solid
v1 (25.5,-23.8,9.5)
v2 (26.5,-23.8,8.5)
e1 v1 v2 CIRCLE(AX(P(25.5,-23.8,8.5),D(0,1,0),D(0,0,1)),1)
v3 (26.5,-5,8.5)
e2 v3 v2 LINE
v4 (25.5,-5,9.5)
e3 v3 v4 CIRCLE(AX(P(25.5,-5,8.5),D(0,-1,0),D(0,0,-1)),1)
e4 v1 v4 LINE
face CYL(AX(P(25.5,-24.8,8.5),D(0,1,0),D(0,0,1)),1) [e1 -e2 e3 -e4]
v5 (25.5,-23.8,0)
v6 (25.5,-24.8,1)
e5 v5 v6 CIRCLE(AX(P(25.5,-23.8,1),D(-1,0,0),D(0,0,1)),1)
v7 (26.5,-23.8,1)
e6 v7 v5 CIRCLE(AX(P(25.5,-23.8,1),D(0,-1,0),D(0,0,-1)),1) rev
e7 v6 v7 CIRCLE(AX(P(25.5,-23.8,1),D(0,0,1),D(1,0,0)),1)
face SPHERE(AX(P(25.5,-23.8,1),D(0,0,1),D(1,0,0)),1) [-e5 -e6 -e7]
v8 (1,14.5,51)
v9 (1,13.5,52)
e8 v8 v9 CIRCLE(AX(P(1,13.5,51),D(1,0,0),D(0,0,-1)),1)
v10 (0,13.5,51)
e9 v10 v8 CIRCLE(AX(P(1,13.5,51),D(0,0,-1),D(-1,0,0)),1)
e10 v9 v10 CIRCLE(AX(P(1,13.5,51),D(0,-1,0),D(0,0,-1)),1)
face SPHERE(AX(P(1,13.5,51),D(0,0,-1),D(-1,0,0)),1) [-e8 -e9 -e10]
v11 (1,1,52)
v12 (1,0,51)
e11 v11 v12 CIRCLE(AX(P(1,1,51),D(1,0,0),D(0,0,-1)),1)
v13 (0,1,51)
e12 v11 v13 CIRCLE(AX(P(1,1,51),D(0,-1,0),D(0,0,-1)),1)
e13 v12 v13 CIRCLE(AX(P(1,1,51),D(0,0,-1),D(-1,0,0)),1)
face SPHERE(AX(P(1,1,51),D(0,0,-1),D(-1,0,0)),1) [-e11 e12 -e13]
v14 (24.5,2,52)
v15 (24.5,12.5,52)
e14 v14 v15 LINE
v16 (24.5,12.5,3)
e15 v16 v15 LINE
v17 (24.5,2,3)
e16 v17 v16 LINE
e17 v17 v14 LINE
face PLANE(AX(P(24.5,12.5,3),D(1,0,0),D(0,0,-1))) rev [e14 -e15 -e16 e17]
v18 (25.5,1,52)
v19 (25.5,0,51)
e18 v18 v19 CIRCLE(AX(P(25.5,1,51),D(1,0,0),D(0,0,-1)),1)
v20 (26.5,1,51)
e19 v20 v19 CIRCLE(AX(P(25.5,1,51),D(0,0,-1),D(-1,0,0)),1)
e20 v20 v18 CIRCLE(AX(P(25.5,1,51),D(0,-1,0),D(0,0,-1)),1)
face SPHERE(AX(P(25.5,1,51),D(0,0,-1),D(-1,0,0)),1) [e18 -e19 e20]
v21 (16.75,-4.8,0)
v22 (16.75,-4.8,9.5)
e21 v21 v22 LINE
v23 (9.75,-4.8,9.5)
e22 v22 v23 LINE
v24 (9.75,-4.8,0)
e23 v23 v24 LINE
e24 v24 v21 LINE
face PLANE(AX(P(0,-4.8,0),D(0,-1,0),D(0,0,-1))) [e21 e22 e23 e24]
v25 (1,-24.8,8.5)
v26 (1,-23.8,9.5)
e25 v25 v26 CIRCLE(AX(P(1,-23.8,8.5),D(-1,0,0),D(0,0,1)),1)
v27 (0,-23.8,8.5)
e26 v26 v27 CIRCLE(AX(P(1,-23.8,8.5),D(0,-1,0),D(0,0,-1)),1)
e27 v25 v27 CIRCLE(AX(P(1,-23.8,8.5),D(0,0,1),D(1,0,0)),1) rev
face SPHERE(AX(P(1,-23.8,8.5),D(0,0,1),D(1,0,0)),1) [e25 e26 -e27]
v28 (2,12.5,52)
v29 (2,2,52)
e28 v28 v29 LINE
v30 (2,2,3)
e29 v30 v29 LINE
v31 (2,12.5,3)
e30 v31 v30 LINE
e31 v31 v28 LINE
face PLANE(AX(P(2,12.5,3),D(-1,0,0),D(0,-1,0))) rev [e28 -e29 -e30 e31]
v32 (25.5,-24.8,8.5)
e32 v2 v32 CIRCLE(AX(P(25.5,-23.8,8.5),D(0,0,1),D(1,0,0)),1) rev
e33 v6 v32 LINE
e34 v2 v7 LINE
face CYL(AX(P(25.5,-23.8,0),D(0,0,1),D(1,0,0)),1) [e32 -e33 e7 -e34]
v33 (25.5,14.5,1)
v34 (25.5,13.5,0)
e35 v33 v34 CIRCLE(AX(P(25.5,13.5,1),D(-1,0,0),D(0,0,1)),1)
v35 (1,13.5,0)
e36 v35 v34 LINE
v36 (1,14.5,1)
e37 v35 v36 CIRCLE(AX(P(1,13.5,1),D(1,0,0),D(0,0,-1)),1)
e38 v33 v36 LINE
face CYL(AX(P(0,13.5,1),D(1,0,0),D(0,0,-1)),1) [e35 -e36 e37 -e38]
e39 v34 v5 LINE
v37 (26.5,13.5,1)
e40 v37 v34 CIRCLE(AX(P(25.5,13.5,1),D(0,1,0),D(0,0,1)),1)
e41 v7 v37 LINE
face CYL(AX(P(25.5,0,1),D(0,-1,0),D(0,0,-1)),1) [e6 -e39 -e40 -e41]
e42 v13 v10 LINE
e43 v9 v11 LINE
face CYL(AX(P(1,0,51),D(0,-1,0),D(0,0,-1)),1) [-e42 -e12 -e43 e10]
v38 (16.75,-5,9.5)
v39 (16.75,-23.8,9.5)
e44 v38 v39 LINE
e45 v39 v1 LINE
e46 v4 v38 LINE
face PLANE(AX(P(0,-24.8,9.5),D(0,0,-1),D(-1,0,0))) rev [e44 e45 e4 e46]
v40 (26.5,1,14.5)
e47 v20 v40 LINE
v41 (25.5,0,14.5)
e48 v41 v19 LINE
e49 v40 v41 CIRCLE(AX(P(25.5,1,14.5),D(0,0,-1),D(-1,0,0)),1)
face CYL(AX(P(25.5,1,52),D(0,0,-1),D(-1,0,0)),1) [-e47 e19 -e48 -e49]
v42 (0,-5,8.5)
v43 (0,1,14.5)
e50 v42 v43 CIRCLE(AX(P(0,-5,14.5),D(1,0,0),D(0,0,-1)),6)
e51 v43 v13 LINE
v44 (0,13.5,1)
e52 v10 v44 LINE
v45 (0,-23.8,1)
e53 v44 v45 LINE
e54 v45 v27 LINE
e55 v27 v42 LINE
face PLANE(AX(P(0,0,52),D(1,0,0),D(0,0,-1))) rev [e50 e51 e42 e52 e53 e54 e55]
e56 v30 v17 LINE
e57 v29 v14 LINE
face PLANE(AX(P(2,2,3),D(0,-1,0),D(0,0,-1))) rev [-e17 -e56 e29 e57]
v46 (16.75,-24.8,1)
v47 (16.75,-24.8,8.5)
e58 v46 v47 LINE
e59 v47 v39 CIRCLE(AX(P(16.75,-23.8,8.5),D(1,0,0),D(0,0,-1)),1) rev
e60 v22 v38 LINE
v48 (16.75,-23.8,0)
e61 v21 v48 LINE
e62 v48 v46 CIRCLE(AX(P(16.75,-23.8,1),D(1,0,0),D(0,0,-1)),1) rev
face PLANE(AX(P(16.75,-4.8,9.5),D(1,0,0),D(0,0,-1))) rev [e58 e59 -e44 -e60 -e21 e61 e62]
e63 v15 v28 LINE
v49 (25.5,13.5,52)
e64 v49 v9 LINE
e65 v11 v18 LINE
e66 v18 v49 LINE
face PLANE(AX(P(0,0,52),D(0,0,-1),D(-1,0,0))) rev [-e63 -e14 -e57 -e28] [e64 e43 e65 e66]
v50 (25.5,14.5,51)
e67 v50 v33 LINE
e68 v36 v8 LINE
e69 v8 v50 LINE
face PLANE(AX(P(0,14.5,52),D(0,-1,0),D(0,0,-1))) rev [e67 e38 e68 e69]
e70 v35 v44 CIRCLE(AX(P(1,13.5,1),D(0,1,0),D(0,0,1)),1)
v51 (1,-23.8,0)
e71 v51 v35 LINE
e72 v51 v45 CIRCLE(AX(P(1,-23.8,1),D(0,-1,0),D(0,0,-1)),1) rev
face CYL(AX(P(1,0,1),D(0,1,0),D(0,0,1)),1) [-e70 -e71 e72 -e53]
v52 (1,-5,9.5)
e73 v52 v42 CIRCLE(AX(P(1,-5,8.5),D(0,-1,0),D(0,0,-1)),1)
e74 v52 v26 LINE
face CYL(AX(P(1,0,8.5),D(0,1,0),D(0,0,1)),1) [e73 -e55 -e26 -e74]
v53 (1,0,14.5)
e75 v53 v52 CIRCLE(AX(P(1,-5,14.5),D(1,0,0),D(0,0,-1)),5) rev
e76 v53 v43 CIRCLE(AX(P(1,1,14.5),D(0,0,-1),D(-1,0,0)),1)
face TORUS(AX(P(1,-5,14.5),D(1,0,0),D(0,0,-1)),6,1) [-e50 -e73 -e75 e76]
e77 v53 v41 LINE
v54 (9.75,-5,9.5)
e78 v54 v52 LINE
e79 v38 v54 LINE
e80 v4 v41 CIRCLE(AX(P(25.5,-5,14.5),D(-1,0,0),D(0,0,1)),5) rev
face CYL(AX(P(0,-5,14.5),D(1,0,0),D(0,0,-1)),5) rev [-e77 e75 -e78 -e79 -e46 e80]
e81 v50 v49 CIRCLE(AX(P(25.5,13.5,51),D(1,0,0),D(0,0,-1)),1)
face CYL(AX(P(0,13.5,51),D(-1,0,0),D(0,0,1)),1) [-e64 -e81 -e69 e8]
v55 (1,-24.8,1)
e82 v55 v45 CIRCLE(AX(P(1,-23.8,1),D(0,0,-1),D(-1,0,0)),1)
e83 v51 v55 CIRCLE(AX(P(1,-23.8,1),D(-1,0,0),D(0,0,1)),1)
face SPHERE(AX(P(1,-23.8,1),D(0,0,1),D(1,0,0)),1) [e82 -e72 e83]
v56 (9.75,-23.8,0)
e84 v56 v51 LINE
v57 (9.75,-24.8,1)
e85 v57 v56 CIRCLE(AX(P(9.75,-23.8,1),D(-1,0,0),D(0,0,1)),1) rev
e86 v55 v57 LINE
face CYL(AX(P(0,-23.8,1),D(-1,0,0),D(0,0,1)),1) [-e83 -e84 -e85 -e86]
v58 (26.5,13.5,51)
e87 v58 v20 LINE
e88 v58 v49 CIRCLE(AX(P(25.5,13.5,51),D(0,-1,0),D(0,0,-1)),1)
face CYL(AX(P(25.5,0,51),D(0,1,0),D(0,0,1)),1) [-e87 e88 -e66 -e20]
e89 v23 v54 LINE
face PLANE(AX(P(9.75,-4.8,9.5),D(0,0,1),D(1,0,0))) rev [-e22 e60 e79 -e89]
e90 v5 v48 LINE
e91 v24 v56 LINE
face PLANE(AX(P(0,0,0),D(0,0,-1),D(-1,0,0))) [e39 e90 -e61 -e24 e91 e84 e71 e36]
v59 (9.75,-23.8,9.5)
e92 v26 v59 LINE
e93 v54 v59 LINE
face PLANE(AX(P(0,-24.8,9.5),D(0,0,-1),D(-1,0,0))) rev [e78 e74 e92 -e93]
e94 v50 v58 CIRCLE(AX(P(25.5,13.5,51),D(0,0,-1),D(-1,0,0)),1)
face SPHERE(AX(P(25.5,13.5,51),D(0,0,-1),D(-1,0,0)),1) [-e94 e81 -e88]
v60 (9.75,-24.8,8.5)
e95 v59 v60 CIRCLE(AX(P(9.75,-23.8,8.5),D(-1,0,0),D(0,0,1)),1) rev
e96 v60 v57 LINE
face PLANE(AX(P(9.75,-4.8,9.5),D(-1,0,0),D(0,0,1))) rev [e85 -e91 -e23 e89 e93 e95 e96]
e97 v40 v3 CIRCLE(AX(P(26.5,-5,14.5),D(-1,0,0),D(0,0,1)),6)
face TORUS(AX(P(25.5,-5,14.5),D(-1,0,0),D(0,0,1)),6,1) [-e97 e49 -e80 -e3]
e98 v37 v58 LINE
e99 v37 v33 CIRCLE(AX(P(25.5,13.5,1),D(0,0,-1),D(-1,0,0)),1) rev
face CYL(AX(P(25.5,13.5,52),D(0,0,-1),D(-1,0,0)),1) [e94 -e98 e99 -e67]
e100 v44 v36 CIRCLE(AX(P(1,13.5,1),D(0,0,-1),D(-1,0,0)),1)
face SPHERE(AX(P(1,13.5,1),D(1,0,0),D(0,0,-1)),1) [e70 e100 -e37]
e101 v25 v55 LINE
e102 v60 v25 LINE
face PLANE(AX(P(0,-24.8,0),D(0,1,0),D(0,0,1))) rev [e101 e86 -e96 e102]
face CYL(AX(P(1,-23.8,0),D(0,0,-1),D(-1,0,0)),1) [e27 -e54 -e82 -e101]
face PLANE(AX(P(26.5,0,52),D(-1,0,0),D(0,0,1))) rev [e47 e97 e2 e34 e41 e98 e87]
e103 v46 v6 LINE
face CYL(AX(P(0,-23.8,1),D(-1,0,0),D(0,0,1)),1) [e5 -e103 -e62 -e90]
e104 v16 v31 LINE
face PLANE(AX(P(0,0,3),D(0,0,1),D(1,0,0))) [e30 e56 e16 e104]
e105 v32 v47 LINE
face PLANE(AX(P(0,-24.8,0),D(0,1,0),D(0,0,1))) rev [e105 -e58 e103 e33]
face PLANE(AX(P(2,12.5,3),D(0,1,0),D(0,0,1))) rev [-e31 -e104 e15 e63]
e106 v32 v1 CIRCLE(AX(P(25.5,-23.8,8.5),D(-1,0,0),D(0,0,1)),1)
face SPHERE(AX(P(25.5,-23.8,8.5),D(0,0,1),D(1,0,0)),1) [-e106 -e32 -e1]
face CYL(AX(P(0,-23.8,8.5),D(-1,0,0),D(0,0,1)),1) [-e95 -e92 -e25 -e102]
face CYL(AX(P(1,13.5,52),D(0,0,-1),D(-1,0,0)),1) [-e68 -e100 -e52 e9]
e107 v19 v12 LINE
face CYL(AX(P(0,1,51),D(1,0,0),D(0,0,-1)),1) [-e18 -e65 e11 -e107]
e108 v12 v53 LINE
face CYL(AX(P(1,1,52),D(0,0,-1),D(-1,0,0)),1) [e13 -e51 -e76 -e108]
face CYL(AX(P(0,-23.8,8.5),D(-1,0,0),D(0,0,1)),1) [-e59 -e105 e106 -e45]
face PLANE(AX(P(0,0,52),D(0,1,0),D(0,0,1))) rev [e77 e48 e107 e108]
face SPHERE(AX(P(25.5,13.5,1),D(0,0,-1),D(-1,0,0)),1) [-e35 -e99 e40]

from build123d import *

# Parameters (mm, degrees)
SKETCH_2_W          = 26.5
SKETCH_2_H          = 14.5
EXTRUDE_1_DEPTH     = 52
SKETCH_6_W          = 22.5
SKETCH_6_H          = 10.5
CUT_EXTRUDE_1_DEPTH = 49
SKETCH_7_W          = 26.5
SKETCH_7_H          = 9.5
EXTRUDE_2_DEPTH     = 24.8
FILLET_1_R          = 5
FILLET_2_R          = 1
FILLET_4_R          = 1
FILLET_5_R          = 1
FILLET_6_R          = 1
SKETCH_8_W          = 7
SKETCH_8_H          = 9.5
CUT_EXTRUDE_2_DEPTH = 20


with BuildPart() as part:
    # ｽｹｯﾁ2 → ﾎﾞｽ - 押し出し1 (new body)
    with BuildSketch(Plane.XY):
        with Locations((13.25, 7.25)):
            Rectangle(SKETCH_2_W, SKETCH_2_H)
    extrude(amount=EXTRUDE_1_DEPTH)

    # ｽｹｯﾁ6 → ｶｯﾄ - 押し出し1 (cut)
    with BuildSketch(Plane.XY.offset(52)):
        with Locations((13.25, 7.25)):
            Rectangle(SKETCH_6_W, SKETCH_6_H)
    extrude(amount=-CUT_EXTRUDE_1_DEPTH, mode=Mode.SUBTRACT)

    # ｽｹｯﾁ7 → ﾎﾞｽ - 押し出し2 (add)
    with BuildSketch(Plane.XZ):
        with Locations((13.25, 4.75)):
            Rectangle(SKETCH_7_W, SKETCH_7_H)
    extrude(amount=EXTRUDE_2_DEPTH)

    # ﾌｨﾚｯﾄ1
    fillet_1_edges = [part.edges().sort_by_distance(p)[0] for p in [
        (13.25, 0, 9.5),
    ]]
    fillet(fillet_1_edges, radius=FILLET_1_R)

    # ﾌｨﾚｯﾄ2
    fillet_2_edges = [part.edges().sort_by_distance(p)[0] for p in [
        (26.5, 14.5, 26),
    ]]
    fillet(fillet_2_edges, radius=FILLET_2_R)

    # ﾌｨﾚｯﾄ4
    fillet_4_edges = [part.edges().sort_by_distance(p)[0] for p in [
        (26.5, -14.9, 9.5),
        (26.5, -24.8, 4.75),
        (26.5, -1.464466094, 10.964466094),
        (12.75, 14.5, 0),
        (26.207106781, 14.207106781, 0),
        (26.5, -5.65, 0),
        (26.5, 0, 33.25),
    ]]
    fillet(fillet_4_edges, radius=FILLET_4_R)

    # ﾌｨﾚｯﾄ5
    # the kernel refuses this fillet: 1 mm, written as the material it takes off along each edge
    with BuildSketch(Plane(origin=(25.5, -23.8, 8.5), x_dir=(0, -1, 0), z_dir=(0, 0, 1))) as fillet_5_piece_1_section:
        Polygon((0, 0), (FILLET_5_R, 0), (FILLET_5_R, FILLET_5_R), (0, FILLET_5_R), align=None)
    fillet_5_piece_1 = extrude(amount=FILLET_5_R, mode=Mode.PRIVATE)
    fillet_5_piece_1 = fillet_5_piece_1 - Plane(origin=(25.5, -23.8, 8.5), x_dir=(-0.7071067811865475, 0.7071067811865475, 0), z_dir=(0, 0, 1)) * Sphere(FILLET_5_R, mode=Mode.PRIVATE)
    add(fillet_5_piece_1, mode=Mode.SUBTRACT)
    with BuildSketch(Plane(origin=(25.5, -23.8, 1), x_dir=(0, -1, 0), z_dir=(0, 0, -1))) as fillet_5_piece_2_section:
        Polygon((0, 0), (FILLET_5_R, 0), (FILLET_5_R, -FILLET_5_R), (0, -FILLET_5_R), align=None)
    fillet_5_piece_2 = extrude(amount=FILLET_5_R, mode=Mode.PRIVATE)
    fillet_5_piece_2 = fillet_5_piece_2 - Plane(origin=(25.5, -23.8, 1), x_dir=(-0.7071067811865475, 0.7071067811865475, 0), z_dir=(0, 0, -1)) * Sphere(FILLET_5_R, mode=Mode.PRIVATE)
    add(fillet_5_piece_2, mode=Mode.SUBTRACT)
    with BuildSketch(Plane(origin=(1, -23.8, 8.5), x_dir=(-1, 0, 0), z_dir=(0, -1, 0))) as fillet_5_piece_3_section:
        Polygon((0, 0), (FILLET_5_R, 0), (FILLET_5_R, -FILLET_5_R), (0, -FILLET_5_R), align=None)
    fillet_5_piece_3 = extrude(amount=FILLET_5_R, mode=Mode.PRIVATE)
    fillet_5_piece_3 = fillet_5_piece_3 - Plane(origin=(1, -23.8, 8.5), x_dir=(0.7071067811865475, 0, -0.7071067811865475), z_dir=(0, -1, 0)) * Sphere(FILLET_5_R, mode=Mode.PRIVATE)
    add(fillet_5_piece_3, mode=Mode.SUBTRACT)
    with BuildSketch(Plane(origin=(1, -23.8, 1), x_dir=(-1, 0, 0), z_dir=(0, 0, -1))) as fillet_5_piece_4_section:
        Polygon((0, 0), (FILLET_5_R, 0), (FILLET_5_R, -FILLET_5_R), (0, -FILLET_5_R), align=None)
    fillet_5_piece_4 = extrude(amount=FILLET_5_R, mode=Mode.PRIVATE)
    fillet_5_piece_4 = fillet_5_piece_4 - Plane(origin=(1, -23.8, 1), x_dir=(0.7071067811865475, 0.7071067811865475, 0), z_dir=(0, 0, -1)) * Sphere(FILLET_5_R, mode=Mode.PRIVATE)
    add(fillet_5_piece_4, mode=Mode.SUBTRACT)
    with BuildSketch(Plane(origin=(0, -5, 9.5), x_dir=(0, 0, -1), z_dir=(0, -1, 0))) as fillet_5_piece_5:
        with BuildLine():
            CenterArc((FILLET_5_R, FILLET_5_R), FILLET_5_R, 180, 90)
            Line((0, FILLET_5_R), (0, 0))
            Line((0, 0), (FILLET_5_R, 0))
        make_face()
    extrude(amount=18.8, mode=Mode.SUBTRACT)
    with BuildSketch(Plane(origin=(0, -24.8, 8.5), x_dir=(0, 1, 0), z_dir=(0, 0, -1))) as fillet_5_piece_6:
        with BuildLine():
            CenterArc((FILLET_5_R, FILLET_5_R), FILLET_5_R, 180, 90)
            Line((0, FILLET_5_R), (0, 0))
            Line((0, 0), (FILLET_5_R, 0))
        make_face()
    extrude(amount=7.5, mode=Mode.SUBTRACT)
    with BuildSketch(Plane(origin=(1, -24.8, 0), x_dir=(0, 1, 0), z_dir=(1, 0, 0)), Plane(origin=(25.5, -24.8, 9.5), x_dir=(0, 1, 0), z_dir=(-1, 0, 0))) as fillet_5_piece_7:
        with BuildLine():
            CenterArc((FILLET_5_R, FILLET_5_R), FILLET_5_R, 180, 90)
            Line((0, FILLET_5_R), (0, 0))
            Line((0, 0), (FILLET_5_R, 0))
        make_face()
    extrude(amount=24.5, mode=Mode.SUBTRACT)
    with BuildSketch(Plane(origin=(0, -5, 14.5), x_dir=(0, 1, 0), z_dir=(0, 0, 1))) as fillet_5_piece_8:
        with BuildLine():
            CenterArc((5 + FILLET_5_R, -FILLET_5_R), FILLET_5_R, 90, 90)
            Line((5, -FILLET_5_R), (5, 0))
            Line((5, 0), (5 + FILLET_5_R, 0))
        make_face()
    revolve(axis=Axis((0, -5, 14.5), (-1, 0, 0)), revolution_arc=90, mode=Mode.SUBTRACT)
    with BuildSketch(Plane(origin=(0, 13.5, 0), x_dir=(0, 0, 1), z_dir=(0, -1, 0))) as fillet_5_piece_9:
        with BuildLine():
            CenterArc((FILLET_5_R, -FILLET_5_R), FILLET_5_R, 90, 90)
            Line((0, -FILLET_5_R), (0, 0))
            Line((0, 0), (FILLET_5_R, 0))
        make_face()
    extrude(amount=37.3, mode=Mode.SUBTRACT)
    with BuildSketch(Plane(origin=(0, 13.5, 1), x_dir=(0, 0, -1), z_dir=(0, -1, 0))) as fillet_5_piece_10:
        with BuildLine():
            CenterArc((1 - FILLET_5_R, FILLET_5_R), FILLET_5_R, 270, 90)
            Line((1, FILLET_5_R), (1, 0))
            Line((1, 0), (1 - FILLET_5_R, 0))
        make_face()
    revolve(axis=Axis((0, 13.5, 1), (1, 0, 0)), revolution_arc=90, mode=Mode.SUBTRACT)
    with BuildSketch(Plane(origin=(0, 14.5, 1), x_dir=(1, 0, 0), z_dir=(0, 0, 1))) as fillet_5_piece_11:
        with BuildLine():
            CenterArc((FILLET_5_R, -FILLET_5_R), FILLET_5_R, 90, 90)
            Line((0, -FILLET_5_R), (0, 0))
            Line((0, 0), (FILLET_5_R, 0))
        make_face()
    extrude(amount=53.5, mode=Mode.SUBTRACT)
    with BuildSketch(Plane(origin=(0, 0, 14.5), x_dir=(1, 0, 0), z_dir=(0, 0, 1))) as fillet_5_piece_12:
        with BuildLine():
            CenterArc((FILLET_5_R, FILLET_5_R), FILLET_5_R, 180, 90)
            Line((0, FILLET_5_R), (0, 0))
            Line((0, 0), (FILLET_5_R, 0))
        make_face()
    extrude(amount=40, mode=Mode.SUBTRACT)

    # ﾌｨﾚｯﾄ6
    fillet_6_edges = [part.edges().sort_by_distance(p)[0] for p in [
        (13.25, 14.5, 52),
        (26.207106781, 14.207106781, 52),
        (26.5, 7.25, 52),
        (26.207106781, 0.292893219, 52),
        (0, 7.25, 52),
        (13.25, 0, 52),
        (0.292893219, 0.292893219, 52),
        (0.292893219, 14.207106781, 52),
    ]]
    fillet(fillet_6_edges, radius=FILLET_6_R)

    # ｽｹｯﾁ8 → ｶｯﾄ - 押し出し2 (cut)
    with BuildSketch(Plane.XZ.offset(24.8)):
        with Locations((13.25, 4.75)):
            Rectangle(SKETCH_8_W, SKETCH_8_H)
    extrude(amount=-CUT_EXTRUDE_2_DEPTH, mode=Mode.SUBTRACT)


solid = part.part
